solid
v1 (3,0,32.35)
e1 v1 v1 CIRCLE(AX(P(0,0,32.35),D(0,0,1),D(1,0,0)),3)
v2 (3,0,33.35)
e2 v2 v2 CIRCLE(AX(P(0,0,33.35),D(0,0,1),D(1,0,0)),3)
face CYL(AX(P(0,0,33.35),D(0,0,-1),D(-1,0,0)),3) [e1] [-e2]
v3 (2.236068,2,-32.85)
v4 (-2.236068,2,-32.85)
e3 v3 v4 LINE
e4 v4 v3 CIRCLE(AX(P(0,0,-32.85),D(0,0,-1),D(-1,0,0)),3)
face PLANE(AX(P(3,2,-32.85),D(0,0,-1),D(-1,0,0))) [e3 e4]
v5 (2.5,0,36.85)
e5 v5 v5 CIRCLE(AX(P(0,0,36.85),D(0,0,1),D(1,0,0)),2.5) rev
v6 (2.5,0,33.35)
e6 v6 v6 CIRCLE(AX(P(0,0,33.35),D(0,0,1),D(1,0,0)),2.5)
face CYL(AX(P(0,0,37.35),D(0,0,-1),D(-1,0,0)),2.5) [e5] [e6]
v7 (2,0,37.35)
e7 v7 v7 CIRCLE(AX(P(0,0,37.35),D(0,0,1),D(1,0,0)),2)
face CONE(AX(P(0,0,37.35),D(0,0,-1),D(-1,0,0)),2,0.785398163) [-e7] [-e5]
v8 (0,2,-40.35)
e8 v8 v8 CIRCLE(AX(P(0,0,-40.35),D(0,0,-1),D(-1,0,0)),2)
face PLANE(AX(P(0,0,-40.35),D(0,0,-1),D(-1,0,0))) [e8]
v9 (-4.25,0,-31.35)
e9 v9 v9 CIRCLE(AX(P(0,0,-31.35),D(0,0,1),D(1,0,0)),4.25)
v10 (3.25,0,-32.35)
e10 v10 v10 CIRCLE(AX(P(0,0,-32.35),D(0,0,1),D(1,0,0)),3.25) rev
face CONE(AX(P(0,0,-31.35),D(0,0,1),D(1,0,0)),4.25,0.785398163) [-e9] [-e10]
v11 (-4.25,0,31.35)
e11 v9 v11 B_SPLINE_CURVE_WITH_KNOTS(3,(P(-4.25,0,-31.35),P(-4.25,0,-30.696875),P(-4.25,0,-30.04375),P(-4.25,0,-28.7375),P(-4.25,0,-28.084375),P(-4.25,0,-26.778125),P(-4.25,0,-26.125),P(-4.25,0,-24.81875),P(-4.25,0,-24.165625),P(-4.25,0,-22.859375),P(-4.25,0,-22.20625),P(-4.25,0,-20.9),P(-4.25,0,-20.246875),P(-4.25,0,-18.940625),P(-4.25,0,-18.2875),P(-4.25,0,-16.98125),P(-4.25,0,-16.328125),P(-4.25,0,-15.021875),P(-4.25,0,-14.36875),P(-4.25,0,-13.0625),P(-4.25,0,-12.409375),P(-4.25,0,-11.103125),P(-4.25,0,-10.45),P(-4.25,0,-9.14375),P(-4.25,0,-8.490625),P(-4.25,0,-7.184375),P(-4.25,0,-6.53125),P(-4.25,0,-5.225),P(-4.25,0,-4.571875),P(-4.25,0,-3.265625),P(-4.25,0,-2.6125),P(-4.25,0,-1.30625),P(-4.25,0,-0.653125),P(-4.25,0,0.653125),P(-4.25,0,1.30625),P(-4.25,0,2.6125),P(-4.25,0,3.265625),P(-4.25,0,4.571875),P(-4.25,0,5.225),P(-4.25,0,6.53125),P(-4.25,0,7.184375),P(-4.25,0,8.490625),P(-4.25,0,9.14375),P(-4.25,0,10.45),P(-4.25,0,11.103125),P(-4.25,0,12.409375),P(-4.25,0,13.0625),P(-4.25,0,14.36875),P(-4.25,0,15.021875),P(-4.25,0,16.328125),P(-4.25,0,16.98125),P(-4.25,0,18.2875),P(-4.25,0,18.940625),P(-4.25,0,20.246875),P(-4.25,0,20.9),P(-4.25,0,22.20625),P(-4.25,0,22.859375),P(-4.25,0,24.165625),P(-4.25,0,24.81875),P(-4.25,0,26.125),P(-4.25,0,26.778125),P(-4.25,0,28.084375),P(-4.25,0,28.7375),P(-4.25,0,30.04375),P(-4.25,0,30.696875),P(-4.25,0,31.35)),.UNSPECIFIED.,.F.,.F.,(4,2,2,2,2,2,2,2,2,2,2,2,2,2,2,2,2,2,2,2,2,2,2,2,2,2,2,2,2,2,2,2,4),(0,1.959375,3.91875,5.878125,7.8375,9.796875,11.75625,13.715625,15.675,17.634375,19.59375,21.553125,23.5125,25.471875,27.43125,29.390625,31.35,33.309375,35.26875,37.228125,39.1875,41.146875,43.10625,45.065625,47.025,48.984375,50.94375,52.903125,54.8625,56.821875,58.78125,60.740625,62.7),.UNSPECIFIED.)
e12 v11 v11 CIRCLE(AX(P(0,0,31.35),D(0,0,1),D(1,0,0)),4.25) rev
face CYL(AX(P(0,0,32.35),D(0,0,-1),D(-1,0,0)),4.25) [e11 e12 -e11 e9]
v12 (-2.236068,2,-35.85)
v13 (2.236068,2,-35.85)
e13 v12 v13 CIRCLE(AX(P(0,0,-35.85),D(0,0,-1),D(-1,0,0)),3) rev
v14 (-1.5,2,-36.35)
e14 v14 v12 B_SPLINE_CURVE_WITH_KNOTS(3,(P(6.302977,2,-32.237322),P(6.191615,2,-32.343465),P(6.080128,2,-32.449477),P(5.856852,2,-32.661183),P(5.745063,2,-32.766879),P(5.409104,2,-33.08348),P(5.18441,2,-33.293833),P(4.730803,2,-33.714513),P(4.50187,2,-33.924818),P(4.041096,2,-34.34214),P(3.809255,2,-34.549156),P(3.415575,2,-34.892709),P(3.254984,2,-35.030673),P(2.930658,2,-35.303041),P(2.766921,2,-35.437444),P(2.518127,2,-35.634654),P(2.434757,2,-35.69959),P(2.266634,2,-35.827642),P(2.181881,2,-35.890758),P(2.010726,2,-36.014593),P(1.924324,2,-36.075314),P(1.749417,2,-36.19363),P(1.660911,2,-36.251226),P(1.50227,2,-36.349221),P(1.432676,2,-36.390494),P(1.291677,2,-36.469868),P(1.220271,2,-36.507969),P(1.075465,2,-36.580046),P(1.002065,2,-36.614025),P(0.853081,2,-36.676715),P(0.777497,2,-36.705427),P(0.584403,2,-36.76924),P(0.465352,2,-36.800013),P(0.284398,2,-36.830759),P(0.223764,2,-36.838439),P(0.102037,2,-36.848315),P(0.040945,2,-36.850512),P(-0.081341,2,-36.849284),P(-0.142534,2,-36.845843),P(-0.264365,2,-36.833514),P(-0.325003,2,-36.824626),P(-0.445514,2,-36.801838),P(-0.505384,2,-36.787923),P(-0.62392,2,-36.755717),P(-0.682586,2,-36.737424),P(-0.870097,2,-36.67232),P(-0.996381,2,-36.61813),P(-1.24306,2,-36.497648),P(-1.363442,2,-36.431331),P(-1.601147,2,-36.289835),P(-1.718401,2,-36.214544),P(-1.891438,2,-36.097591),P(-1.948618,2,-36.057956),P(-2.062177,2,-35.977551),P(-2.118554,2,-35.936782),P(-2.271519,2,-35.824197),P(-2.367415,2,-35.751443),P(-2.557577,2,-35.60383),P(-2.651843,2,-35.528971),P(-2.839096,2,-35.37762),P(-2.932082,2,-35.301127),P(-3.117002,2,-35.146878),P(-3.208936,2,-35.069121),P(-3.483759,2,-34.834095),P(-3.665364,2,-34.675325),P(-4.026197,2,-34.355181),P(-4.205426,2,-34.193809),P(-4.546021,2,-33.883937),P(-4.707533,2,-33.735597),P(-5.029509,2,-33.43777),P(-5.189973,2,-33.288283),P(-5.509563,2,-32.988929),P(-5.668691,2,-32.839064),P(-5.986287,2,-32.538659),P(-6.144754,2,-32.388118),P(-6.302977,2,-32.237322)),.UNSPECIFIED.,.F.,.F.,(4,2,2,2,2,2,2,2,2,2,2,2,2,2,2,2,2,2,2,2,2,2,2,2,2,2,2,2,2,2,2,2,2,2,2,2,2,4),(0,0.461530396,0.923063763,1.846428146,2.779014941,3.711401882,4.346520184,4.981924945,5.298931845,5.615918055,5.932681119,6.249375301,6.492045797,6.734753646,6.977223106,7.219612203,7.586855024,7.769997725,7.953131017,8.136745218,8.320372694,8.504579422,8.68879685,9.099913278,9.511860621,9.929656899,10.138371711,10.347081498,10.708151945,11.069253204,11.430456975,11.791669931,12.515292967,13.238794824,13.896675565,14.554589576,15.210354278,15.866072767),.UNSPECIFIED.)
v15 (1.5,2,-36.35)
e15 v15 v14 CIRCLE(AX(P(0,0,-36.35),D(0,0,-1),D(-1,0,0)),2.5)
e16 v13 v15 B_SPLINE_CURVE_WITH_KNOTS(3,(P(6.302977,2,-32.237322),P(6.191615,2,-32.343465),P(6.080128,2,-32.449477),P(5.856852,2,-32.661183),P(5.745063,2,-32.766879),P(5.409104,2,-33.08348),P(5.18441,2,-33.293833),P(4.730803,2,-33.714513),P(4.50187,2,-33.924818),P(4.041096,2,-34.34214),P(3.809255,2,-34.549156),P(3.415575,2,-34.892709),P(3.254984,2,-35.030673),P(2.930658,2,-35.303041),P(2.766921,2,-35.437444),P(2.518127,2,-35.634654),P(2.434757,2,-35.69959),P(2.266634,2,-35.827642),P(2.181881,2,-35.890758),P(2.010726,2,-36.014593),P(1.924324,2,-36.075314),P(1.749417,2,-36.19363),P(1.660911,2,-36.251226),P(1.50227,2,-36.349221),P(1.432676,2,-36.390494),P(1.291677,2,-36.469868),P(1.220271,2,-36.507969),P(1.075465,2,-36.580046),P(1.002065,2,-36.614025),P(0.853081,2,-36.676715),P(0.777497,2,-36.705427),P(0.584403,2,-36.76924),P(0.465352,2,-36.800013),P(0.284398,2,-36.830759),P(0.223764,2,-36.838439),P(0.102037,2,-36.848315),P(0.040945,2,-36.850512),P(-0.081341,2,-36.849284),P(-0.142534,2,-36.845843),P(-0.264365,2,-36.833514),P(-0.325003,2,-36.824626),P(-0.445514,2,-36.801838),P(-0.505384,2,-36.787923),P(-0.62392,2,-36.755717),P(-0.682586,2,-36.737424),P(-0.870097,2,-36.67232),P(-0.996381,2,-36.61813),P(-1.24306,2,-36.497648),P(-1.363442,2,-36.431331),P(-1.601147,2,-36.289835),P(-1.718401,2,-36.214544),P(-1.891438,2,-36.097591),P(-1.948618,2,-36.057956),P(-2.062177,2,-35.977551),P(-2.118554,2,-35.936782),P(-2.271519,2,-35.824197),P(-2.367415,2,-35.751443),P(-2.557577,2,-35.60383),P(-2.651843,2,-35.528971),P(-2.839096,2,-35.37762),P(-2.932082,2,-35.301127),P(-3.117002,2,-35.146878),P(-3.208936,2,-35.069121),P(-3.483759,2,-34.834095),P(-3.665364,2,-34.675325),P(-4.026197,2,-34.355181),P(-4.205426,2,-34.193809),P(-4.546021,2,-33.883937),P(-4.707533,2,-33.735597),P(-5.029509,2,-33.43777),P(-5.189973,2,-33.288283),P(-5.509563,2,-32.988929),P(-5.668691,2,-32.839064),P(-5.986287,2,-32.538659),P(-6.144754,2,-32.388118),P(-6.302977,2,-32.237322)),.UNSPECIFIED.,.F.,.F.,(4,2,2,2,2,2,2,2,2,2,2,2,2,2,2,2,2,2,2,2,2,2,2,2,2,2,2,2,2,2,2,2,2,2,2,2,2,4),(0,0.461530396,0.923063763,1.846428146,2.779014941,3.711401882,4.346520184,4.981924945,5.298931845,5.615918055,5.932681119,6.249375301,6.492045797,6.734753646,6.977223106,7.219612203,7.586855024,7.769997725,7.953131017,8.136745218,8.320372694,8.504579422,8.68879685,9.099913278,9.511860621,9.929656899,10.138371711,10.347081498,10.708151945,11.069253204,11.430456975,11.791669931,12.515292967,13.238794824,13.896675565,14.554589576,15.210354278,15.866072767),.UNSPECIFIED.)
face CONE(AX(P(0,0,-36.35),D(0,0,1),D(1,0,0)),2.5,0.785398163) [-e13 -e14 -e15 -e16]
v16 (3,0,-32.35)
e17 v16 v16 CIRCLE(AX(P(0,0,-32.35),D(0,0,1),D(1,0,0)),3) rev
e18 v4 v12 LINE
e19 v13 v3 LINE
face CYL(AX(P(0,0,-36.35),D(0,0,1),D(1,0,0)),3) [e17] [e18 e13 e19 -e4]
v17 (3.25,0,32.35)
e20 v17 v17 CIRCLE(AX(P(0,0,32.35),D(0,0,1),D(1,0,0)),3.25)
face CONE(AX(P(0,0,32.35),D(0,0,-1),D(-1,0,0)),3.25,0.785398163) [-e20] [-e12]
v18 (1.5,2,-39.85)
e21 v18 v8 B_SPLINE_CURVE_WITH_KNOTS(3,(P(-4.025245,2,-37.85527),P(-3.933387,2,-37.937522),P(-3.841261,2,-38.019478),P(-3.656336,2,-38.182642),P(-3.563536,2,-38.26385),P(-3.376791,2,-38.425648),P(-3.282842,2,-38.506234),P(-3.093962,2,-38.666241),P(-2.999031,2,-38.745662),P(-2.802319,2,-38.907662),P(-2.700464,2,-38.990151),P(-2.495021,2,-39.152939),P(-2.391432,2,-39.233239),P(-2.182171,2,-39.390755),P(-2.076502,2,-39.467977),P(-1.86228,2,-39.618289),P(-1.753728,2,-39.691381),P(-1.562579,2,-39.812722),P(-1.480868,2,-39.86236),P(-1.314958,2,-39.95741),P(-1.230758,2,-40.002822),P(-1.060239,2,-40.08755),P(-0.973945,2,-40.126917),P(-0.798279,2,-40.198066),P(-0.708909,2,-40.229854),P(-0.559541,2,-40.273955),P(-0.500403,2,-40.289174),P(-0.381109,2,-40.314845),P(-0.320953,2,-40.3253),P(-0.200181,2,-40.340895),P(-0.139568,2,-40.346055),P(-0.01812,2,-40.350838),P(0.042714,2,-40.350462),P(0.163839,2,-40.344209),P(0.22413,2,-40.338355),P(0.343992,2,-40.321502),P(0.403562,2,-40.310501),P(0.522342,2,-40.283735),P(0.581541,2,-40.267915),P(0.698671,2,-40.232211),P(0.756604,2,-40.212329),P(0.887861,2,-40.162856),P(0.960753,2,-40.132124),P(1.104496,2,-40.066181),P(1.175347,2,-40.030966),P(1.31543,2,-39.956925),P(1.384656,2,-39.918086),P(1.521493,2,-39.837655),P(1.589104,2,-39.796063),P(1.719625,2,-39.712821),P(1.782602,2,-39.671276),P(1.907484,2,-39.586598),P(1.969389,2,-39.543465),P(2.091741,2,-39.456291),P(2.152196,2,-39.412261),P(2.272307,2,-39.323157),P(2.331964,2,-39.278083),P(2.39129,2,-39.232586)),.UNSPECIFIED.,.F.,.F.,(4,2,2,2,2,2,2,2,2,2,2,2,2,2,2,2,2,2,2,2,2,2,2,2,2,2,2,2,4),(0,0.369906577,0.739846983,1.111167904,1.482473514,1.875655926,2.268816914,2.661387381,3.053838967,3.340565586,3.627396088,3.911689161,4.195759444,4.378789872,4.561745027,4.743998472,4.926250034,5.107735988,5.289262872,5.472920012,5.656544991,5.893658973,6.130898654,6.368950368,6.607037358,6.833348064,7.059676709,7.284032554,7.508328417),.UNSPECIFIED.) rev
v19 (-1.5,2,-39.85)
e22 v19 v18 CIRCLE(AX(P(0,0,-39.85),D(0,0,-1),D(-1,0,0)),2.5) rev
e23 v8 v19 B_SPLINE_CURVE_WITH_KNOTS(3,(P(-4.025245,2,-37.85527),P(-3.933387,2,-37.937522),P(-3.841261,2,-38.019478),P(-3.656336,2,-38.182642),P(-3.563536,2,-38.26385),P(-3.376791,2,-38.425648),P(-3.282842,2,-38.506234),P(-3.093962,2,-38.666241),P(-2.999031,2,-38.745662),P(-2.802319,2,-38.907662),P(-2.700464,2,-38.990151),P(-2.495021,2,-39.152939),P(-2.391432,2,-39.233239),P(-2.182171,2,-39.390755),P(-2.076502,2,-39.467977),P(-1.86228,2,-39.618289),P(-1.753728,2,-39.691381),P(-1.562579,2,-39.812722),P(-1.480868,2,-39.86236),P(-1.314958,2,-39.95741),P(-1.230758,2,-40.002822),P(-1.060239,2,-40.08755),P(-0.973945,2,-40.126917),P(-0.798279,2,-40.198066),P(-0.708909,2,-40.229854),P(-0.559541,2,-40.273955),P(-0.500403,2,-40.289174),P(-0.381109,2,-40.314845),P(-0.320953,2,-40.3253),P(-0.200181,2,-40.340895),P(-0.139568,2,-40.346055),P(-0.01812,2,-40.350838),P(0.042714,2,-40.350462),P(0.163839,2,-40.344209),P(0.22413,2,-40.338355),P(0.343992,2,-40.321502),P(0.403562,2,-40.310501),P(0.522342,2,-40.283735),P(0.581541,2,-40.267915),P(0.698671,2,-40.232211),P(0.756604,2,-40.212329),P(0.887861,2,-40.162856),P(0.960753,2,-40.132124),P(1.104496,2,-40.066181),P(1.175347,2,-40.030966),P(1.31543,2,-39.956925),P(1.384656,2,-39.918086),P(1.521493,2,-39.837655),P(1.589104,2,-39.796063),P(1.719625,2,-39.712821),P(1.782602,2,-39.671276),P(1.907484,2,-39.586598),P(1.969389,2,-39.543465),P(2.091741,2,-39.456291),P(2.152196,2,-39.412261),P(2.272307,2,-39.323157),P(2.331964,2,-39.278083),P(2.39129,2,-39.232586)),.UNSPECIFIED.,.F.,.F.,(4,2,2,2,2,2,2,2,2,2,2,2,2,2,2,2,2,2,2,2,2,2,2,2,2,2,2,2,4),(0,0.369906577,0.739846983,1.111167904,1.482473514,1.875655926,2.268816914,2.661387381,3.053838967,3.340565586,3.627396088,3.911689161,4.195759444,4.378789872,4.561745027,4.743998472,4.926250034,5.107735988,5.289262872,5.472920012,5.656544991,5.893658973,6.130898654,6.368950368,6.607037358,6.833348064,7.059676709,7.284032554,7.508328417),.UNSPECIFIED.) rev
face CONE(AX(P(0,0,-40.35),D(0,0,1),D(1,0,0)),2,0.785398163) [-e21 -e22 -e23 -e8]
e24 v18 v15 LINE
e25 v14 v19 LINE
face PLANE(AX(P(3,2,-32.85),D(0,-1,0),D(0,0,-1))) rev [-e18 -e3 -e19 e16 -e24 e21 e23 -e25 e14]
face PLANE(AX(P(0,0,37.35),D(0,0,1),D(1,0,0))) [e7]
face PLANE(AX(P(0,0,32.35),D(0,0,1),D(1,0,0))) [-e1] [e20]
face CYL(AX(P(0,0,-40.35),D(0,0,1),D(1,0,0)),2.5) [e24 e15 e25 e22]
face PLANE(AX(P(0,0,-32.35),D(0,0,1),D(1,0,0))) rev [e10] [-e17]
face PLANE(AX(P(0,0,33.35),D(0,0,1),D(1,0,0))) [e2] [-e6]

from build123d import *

# Parameters (mm, degrees)
SKETCH_1_R          = 4.25
EXTRUDE_1_DEPTH     = 32.35
SKETCH_2_R          = 3
EXTRUDE_2_DEPTH     = 1
SKETCH_3_R          = 2.5
EXTRUDE_3_DEPTH     = 4
EXTRUDE_START       = 4
SKETCH_4_R          = 3
EXTRUDE_4_DEPTH     = 4
SKETCH_5_R          = 2.5
EXTRUDE_5_DEPTH     = 4
CHAMFER_1_SIZE      = 0.5
CHAMFER_2_SIZE      = 0.5
SKETCH_6_W          = 6
SKETCH_6_H          = 3
CUT_EXTRUDE_6_DEPTH = 7.5
CHAMFER1_SIZE       = 1


with BuildPart() as part:
    # 草图1 → 拉伸1 (new, symmetric)
    with BuildSketch(Plane.XY):
        with Locations(Location((0, 0, 0), (0, 0, 180))):
            Circle(SKETCH_1_R)
    extrude(amount=EXTRUDE_1_DEPTH, both=True)

    # 草图2 → 拉伸2 (add)
    with BuildSketch(Plane.XY.offset(32.35)):
        Circle(SKETCH_2_R)
    extrude(amount=EXTRUDE_2_DEPTH)

    # 草图3 → 拉伸3 (add)
    with BuildSketch(Plane.XY.offset(33.35)):
        Circle(SKETCH_3_R)
    extrude(amount=EXTRUDE_3_DEPTH)

    # 草图4 → 拉伸4 (add)
    with BuildSketch(Plane(origin=(0, 0, -32.35), x_dir=(-1, 0, 0), z_dir=(0, 0, -1)).offset(EXTRUDE_START)):
        with Locations(Location((0, 0, 0), (0, 0, 180))):
            Circle(SKETCH_4_R)
    extrude(amount=-EXTRUDE_4_DEPTH)

    # 草图5 → 拉伸5 (add)
    with BuildSketch(Plane(origin=(0, 0, -36.35), x_dir=(-1, 0, 0), z_dir=(0, 0, -1)).offset(EXTRUDE_START)):
        with Locations(Location((0, 0, 0), (0, 0, 180))):
            Circle(SKETCH_5_R)
    extrude(amount=-EXTRUDE_5_DEPTH)

    # 倒角1
    chamfer_1_edges = [part.edges().sort_by_distance(p)[0] for p in [
        (-2.5, 0, 37.35),
        (-2.5, 0, -40.35),
    ]]
    chamfer(chamfer_1_edges, length=CHAMFER_1_SIZE)

    # 倒角2
    chamfer_2_edges = [part.edges().sort_by_distance(p)[0] for p in [
        (-3, 0, -36.35),
    ]]
    chamfer(chamfer_2_edges, length=CHAMFER_2_SIZE - 0.0001)  # a hair under: the kernel refuses the full size

    # 草图6 → 拉伸6 (cut)
    with BuildSketch(Plane(origin=(0, 0, -40.35), x_dir=(-1, 0, 0), z_dir=(0, 0, -1))):
        with Locations((0, 3.5)):
            Rectangle(SKETCH_6_W, SKETCH_6_H)
    extrude(amount=-CUT_EXTRUDE_6_DEPTH, mode=Mode.SUBTRACT)

    # Chamfer1
    chamfer1_edges = [part.edges().sort_by_distance(p)[0] for p in [
        (4.25, 0, -32.35),
        (4.25, 0, 32.35),
    ]]
    chamfer(chamfer1_edges, length=CHAMFER1_SIZE)


solid = part.part
